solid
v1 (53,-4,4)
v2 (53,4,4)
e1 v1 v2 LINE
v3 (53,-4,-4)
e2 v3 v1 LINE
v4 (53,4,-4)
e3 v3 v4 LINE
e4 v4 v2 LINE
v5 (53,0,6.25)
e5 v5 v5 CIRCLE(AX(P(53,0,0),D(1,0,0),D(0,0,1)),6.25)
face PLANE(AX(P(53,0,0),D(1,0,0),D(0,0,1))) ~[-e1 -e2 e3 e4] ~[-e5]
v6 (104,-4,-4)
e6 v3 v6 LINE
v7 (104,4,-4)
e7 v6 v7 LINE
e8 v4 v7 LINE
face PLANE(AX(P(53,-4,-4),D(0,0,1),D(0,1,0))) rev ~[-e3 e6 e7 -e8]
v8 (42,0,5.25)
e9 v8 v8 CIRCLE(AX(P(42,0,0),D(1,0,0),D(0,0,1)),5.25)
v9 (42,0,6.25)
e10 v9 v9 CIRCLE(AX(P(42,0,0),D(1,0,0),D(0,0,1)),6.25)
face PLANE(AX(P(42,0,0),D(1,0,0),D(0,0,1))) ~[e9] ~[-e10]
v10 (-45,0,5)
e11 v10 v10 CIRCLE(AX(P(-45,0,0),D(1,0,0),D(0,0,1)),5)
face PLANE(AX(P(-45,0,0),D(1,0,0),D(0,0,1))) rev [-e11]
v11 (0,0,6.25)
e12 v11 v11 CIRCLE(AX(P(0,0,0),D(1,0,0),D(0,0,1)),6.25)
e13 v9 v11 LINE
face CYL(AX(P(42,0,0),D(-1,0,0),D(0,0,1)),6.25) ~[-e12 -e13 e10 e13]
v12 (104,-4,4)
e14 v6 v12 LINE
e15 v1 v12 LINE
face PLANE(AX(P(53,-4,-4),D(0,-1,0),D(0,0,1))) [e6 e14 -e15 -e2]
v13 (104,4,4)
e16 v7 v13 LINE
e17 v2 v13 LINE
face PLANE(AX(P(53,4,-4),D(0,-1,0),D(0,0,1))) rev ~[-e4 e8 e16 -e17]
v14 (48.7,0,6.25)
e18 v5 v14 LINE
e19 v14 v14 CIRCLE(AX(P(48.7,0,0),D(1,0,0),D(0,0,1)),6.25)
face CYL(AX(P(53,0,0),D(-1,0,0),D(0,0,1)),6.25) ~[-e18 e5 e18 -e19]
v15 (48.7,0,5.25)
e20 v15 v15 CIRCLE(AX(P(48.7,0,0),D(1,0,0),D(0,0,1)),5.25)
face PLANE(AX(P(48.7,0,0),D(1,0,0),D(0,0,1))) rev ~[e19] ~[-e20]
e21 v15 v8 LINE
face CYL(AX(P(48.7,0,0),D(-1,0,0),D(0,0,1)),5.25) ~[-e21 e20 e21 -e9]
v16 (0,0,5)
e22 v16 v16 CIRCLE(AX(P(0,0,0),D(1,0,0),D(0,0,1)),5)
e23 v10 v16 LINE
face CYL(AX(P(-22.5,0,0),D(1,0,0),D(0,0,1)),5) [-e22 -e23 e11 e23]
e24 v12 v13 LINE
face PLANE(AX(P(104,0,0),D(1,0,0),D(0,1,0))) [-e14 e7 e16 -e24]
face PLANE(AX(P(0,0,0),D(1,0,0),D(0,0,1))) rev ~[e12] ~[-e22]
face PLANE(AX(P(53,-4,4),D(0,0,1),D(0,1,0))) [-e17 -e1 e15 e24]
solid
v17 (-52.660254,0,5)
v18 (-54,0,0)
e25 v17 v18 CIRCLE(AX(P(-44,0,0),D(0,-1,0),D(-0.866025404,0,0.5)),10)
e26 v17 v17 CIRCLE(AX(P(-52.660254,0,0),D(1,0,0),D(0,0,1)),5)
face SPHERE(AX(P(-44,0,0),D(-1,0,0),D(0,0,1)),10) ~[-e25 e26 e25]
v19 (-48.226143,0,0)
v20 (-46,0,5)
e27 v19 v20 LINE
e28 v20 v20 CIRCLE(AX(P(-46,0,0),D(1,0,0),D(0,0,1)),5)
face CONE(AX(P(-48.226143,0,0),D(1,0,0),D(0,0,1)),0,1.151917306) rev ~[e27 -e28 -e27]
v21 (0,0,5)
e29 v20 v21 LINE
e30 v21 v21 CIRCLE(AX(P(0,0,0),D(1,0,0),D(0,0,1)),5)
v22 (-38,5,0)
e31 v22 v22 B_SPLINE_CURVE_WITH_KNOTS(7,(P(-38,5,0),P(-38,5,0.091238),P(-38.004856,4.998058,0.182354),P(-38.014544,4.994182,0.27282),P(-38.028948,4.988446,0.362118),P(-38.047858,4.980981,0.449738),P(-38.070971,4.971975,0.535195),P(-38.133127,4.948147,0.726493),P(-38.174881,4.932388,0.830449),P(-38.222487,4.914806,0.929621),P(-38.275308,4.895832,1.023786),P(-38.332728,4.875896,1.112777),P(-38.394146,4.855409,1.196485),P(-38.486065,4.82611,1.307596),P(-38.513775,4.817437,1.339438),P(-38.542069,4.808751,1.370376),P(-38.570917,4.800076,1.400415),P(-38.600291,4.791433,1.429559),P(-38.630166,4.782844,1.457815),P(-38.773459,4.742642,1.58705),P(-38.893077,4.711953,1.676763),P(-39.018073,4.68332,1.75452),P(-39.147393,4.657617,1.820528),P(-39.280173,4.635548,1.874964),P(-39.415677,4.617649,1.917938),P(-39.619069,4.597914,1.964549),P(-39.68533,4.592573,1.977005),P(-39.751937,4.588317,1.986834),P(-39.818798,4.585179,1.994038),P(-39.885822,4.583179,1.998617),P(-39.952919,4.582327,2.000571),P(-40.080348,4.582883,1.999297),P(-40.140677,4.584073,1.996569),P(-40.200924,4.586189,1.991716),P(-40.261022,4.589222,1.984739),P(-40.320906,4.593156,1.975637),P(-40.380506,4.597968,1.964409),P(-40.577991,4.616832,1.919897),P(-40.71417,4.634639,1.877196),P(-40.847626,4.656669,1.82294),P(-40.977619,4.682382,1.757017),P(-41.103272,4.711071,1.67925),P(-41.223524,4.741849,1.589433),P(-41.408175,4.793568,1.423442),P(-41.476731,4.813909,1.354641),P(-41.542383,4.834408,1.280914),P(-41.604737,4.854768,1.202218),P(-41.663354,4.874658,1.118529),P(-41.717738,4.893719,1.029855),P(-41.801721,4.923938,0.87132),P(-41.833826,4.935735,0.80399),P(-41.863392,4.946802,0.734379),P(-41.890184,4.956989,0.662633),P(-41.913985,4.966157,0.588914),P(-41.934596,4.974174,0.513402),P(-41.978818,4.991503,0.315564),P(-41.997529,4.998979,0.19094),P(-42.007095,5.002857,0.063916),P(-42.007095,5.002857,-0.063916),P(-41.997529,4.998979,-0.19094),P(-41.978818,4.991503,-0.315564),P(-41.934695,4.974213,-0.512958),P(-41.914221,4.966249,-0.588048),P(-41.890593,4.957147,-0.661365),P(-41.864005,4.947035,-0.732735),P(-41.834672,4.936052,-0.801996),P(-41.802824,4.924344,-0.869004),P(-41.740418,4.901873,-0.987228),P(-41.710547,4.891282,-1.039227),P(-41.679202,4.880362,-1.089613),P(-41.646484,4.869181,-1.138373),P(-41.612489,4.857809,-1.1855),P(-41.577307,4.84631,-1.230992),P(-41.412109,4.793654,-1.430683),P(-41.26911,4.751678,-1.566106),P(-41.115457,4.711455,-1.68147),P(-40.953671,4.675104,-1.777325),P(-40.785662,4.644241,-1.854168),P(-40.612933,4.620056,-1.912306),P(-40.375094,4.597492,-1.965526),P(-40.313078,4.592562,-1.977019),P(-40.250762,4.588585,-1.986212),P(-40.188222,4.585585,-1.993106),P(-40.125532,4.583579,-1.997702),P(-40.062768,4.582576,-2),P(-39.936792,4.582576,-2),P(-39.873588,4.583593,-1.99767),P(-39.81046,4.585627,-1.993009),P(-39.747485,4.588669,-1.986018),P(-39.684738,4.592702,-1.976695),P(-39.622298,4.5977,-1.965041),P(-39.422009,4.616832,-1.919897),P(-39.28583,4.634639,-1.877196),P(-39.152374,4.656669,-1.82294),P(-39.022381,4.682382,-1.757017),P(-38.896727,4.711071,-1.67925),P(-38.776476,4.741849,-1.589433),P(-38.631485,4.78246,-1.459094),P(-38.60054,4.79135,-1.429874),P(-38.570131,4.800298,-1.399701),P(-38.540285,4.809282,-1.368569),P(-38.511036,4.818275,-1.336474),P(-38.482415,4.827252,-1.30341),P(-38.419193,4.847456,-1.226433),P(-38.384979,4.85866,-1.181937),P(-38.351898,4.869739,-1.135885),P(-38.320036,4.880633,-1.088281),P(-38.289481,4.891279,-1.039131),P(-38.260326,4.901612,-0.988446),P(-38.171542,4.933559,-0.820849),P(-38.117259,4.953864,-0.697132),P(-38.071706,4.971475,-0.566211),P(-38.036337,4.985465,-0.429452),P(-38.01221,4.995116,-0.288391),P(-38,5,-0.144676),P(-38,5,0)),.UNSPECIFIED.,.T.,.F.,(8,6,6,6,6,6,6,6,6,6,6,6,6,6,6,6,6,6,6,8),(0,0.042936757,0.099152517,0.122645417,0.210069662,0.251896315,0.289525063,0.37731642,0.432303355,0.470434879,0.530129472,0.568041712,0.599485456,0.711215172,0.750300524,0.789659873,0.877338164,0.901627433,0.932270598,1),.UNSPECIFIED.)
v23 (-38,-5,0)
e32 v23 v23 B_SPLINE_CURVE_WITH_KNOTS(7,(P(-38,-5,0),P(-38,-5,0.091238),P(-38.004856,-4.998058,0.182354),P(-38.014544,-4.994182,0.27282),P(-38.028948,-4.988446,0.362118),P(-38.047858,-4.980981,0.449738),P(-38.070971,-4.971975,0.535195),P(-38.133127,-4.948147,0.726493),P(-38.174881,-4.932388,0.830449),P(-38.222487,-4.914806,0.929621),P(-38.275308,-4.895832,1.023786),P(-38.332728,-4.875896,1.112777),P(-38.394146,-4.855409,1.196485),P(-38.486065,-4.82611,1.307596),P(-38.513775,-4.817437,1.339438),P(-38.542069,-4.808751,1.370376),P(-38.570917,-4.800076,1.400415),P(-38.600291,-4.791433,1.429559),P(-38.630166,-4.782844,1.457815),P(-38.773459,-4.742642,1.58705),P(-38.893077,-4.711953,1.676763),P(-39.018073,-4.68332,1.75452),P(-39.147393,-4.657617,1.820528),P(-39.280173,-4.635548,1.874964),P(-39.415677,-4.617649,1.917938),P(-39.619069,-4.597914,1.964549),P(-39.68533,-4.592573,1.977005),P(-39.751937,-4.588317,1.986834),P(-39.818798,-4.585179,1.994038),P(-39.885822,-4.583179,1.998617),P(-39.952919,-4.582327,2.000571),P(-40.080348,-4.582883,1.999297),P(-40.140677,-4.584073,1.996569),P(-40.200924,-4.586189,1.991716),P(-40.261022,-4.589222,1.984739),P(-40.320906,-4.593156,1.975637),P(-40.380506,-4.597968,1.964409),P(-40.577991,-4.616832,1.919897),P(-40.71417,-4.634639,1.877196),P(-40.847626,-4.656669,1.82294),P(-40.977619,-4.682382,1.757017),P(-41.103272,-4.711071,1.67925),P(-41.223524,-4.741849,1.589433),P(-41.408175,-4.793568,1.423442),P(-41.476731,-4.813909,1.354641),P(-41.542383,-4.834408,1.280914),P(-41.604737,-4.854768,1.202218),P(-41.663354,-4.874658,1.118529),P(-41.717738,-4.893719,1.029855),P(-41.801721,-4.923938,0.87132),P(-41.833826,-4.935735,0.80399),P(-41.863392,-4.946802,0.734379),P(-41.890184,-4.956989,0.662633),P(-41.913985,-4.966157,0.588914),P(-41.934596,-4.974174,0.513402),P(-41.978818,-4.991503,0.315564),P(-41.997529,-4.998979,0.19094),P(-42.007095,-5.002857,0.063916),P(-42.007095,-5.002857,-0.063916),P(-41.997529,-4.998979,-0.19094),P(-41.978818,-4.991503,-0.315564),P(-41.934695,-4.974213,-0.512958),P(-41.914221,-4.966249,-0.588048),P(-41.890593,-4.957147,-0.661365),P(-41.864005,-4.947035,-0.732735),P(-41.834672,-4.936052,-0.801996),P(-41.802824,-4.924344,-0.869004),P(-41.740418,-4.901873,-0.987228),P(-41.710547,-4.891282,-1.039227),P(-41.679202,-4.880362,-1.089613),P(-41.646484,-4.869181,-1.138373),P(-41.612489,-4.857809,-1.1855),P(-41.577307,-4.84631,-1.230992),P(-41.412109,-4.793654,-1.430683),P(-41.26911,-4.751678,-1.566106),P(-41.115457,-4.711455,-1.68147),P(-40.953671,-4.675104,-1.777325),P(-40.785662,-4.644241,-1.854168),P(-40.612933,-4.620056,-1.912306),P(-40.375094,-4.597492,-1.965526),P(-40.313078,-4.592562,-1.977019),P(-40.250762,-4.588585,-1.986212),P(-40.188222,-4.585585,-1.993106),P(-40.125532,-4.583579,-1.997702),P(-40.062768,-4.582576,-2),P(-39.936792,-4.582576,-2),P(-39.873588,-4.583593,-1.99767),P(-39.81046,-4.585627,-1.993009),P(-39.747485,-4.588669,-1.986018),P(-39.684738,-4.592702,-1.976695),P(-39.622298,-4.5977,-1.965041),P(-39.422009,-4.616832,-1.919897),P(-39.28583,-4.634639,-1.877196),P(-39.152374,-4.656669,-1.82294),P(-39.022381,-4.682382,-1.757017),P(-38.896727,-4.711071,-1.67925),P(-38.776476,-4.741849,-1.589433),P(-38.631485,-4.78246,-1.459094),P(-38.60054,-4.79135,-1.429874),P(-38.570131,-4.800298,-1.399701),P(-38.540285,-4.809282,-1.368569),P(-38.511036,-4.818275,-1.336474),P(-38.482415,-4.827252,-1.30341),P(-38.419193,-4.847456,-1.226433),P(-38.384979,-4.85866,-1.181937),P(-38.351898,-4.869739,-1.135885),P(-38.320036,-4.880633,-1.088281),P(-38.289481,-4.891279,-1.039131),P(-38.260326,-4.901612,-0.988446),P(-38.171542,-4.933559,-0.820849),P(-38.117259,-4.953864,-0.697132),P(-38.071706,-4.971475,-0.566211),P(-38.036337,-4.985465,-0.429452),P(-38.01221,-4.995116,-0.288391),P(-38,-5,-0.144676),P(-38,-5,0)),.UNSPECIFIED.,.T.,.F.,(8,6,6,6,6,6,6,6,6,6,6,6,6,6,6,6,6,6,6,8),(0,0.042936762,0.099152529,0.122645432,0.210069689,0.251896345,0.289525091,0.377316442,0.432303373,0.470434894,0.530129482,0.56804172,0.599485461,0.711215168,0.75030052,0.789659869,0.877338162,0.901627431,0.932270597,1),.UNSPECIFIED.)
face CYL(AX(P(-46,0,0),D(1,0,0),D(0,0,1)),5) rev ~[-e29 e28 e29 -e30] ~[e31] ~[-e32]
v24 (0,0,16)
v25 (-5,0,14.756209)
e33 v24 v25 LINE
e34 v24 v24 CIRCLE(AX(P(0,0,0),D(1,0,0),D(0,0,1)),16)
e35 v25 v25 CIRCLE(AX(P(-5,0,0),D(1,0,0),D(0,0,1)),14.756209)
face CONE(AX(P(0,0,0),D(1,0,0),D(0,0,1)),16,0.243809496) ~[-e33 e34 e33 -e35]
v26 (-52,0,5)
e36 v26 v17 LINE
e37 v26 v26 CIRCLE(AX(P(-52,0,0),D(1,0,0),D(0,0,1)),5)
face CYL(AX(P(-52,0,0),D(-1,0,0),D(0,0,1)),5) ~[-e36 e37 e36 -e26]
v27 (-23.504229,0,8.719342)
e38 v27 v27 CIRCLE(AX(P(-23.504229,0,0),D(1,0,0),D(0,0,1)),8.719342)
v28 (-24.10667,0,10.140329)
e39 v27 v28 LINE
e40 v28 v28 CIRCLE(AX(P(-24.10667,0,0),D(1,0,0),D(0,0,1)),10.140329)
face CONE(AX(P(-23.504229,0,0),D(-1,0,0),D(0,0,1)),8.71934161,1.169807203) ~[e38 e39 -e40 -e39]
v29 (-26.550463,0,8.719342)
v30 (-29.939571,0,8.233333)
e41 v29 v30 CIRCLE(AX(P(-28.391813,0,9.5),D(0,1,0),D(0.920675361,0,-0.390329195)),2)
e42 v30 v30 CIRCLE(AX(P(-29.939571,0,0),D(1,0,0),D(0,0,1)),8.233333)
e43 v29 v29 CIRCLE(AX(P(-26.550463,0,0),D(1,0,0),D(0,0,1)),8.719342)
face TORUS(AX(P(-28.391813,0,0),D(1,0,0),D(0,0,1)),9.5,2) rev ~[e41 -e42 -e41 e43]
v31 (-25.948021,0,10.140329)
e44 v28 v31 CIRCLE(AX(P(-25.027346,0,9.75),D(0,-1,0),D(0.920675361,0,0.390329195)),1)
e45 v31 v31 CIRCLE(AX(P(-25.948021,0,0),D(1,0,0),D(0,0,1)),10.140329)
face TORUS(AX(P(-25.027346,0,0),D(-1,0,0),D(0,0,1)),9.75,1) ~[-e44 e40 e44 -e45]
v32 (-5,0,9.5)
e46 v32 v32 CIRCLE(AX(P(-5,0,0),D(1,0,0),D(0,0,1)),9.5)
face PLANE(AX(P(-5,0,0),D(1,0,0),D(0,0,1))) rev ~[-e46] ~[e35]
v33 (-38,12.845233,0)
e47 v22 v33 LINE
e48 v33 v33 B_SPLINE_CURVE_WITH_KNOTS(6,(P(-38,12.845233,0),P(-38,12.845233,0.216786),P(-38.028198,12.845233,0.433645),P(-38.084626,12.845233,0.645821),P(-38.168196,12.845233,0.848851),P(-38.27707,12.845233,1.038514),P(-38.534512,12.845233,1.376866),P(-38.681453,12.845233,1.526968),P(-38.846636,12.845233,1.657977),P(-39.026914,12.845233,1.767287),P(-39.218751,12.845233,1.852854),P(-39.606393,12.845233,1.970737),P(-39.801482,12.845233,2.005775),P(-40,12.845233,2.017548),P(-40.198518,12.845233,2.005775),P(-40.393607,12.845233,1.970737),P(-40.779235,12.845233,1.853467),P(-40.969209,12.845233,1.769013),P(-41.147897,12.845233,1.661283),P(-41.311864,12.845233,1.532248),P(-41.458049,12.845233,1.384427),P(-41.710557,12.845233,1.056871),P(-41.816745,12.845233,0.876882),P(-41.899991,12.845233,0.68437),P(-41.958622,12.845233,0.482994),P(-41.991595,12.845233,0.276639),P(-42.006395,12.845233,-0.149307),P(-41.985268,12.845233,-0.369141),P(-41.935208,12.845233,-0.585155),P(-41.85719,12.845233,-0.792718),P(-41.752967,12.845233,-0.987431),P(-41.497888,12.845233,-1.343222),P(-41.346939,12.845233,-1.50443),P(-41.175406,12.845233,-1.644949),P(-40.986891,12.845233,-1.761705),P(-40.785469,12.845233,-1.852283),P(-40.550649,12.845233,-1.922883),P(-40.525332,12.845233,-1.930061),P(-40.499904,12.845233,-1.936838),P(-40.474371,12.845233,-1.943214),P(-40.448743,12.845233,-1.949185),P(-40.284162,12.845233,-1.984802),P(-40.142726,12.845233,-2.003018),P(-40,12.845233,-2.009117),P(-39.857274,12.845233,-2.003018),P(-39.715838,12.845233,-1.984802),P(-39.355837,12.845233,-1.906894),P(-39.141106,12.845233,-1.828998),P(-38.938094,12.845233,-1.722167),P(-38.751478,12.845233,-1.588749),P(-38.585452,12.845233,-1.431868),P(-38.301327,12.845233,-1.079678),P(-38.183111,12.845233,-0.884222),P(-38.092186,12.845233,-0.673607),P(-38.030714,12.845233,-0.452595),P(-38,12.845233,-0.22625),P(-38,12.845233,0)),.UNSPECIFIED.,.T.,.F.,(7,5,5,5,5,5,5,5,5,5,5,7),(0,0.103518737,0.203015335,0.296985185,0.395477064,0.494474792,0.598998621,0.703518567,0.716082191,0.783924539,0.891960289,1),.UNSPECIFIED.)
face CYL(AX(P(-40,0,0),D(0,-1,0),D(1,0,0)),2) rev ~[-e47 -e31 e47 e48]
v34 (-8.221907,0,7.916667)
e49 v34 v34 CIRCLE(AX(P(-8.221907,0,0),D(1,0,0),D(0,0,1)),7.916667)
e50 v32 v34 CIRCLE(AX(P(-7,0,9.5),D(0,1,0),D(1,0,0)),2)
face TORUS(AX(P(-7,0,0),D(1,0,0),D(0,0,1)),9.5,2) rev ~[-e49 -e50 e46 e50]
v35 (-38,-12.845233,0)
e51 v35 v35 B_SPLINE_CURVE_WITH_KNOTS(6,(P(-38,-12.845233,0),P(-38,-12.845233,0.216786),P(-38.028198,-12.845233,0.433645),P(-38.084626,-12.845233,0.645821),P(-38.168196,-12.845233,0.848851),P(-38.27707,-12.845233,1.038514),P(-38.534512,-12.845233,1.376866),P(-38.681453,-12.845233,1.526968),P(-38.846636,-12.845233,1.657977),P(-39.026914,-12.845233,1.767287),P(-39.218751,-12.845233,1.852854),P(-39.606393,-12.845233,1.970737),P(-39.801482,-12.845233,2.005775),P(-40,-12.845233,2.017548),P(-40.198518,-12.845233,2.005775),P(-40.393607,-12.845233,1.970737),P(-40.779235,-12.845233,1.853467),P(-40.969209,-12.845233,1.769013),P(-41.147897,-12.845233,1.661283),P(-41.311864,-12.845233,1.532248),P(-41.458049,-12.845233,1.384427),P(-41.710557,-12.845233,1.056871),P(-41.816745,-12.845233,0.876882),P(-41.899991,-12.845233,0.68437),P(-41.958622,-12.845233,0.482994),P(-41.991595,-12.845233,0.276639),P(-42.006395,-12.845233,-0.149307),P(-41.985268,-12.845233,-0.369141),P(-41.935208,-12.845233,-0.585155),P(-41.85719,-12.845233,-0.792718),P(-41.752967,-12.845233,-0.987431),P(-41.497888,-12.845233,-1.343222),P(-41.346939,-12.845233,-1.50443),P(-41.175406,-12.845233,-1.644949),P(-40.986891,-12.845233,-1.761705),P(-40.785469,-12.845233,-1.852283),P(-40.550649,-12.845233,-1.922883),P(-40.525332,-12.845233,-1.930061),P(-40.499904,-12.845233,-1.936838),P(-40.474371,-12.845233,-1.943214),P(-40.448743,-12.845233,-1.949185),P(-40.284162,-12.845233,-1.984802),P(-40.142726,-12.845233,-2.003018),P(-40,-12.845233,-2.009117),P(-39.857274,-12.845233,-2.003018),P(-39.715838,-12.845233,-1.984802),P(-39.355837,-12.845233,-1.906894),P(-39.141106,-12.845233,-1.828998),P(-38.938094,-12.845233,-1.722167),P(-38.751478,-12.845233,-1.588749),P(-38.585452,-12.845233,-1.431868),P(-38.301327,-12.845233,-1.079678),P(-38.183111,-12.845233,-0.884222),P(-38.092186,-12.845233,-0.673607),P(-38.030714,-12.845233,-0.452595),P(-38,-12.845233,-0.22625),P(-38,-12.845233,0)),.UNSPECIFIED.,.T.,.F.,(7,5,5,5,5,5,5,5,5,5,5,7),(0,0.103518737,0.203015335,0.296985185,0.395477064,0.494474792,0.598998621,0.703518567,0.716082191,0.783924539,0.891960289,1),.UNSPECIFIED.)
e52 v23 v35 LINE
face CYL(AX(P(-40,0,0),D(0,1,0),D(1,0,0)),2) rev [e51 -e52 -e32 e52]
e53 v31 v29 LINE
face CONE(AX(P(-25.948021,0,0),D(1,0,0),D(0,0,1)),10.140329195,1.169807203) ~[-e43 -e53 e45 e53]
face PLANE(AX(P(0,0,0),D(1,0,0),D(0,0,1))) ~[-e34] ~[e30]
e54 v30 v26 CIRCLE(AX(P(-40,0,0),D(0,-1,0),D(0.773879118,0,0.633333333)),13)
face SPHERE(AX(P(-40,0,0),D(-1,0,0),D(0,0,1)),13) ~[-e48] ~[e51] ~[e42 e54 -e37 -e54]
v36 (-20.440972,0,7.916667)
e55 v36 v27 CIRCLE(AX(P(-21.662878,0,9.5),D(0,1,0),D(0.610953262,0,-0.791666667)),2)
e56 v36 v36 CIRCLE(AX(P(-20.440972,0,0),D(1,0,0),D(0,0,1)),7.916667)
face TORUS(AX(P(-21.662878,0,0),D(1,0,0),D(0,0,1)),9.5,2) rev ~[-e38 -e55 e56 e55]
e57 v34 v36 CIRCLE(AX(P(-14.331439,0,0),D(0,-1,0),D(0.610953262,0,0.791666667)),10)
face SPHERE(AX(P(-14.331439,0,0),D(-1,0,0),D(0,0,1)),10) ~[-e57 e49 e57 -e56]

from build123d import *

# Parameters (mm, degrees)
F2_W          = 8
F2_H          = 8
F3_DEPTH      = 51
F4_W          = 45
F4_H          = 5
F8_R          = 2
F9_DEPTH      = 16.001
F9_DEPTH_BACK = 16.001


with BuildPart() as f1:
    # F0 (on Front) → F1 (revolve)
    with BuildSketch(Plane.XZ):
        Polygon((0, 6.25), (0, 0), (53, 0), (53, 6.25), (48.7, 6.25), (48.7, 5.25), (42, 5.25), (42, 6.25), align=None)
    revolve(axis=Axis((26.2976505187, 0, 0), (1, 0, 0)))

    # F2 (on face) → F3 (join)
    with BuildSketch(Plane.YZ.offset(53)):
        Rectangle(F2_W, F2_H)
    extrude(amount=F3_DEPTH)

    # F4 (on Front) → F5 (revolve)
    with BuildSketch(Plane.XZ):
        with Locations((-22.5, 2.5)):
            Rectangle(F4_W, F4_H)
    revolve(axis=Axis((-20.4847540462, 0, 0), (1, 0, 0)))


with BuildPart() as f7:
    # F6 (on Front) → F7 (revolve)
    with BuildSketch(Plane.XZ):
        with BuildLine():
            Line((-46, 5), (0, 5))
            Line((0, 5), (0, 16))
            Line((0, 16), (-5, 14.7562093884))
            Line((-5, 14.7562093884), (-5, 9.5))
            ThreePointArc((-5, 9.5), (-6.1179039309, 7.7050330017), (-8.2219065249, 7.9166666667))
            ThreePointArc((-8.2219065249, 7.9166666667), (-14.3314391493, 10), (-20.4409717737, 7.9166666667))
            ThreePointArc((-20.4409717737, 7.9166666667), (-22.1698295233, 7.5653164456), (-23.5042290197, 8.71934161))
            Line((-23.5042290197, 8.71934161), (-24.1066704056, 10.140329195))
            ThreePointArc((-24.1066704056, 10.140329195), (-25.0273457662, 10.75), (-25.9480211267, 10.140329195))
            Line((-25.9480211267, 10.140329195), (-26.5504625127, 8.71934161))
            ThreePointArc((-26.5504625127, 8.71934161), (-28.1079115815, 7.5202525788), (-29.9395714693, 8.2333333333))
            ThreePointArc((-29.9395714693, 8.2333333333), (-41.885230883, 12.8625776778), (-52, 5))
            Line((-52, 5), (-52.6602540378, 5))
            ThreePointArc((-52.6602540378, 5), (-53.6592582629, 2.588190451), (-54, 0))
            Line((-54, 0), (-48.2261434265, 0))
            Line((-48.2261434265, 0), (-46, 5))
        make_face()
    revolve(axis=Axis((-24.4397171773, 0, 0), (1, 0, 0)))

    # F8 (on Front) → F9 (cut, two sides)
    with BuildSketch(Plane.XZ) as f9_sk:
        with Locations((-40, 0)):
            Circle(F8_R)
    extrude(amount=-F9_DEPTH, mode=Mode.SUBTRACT)
    extrude(f9_sk.sketch, amount=F9_DEPTH_BACK, mode=Mode.SUBTRACT)


solid = Compound([f1.part, f7.part])
